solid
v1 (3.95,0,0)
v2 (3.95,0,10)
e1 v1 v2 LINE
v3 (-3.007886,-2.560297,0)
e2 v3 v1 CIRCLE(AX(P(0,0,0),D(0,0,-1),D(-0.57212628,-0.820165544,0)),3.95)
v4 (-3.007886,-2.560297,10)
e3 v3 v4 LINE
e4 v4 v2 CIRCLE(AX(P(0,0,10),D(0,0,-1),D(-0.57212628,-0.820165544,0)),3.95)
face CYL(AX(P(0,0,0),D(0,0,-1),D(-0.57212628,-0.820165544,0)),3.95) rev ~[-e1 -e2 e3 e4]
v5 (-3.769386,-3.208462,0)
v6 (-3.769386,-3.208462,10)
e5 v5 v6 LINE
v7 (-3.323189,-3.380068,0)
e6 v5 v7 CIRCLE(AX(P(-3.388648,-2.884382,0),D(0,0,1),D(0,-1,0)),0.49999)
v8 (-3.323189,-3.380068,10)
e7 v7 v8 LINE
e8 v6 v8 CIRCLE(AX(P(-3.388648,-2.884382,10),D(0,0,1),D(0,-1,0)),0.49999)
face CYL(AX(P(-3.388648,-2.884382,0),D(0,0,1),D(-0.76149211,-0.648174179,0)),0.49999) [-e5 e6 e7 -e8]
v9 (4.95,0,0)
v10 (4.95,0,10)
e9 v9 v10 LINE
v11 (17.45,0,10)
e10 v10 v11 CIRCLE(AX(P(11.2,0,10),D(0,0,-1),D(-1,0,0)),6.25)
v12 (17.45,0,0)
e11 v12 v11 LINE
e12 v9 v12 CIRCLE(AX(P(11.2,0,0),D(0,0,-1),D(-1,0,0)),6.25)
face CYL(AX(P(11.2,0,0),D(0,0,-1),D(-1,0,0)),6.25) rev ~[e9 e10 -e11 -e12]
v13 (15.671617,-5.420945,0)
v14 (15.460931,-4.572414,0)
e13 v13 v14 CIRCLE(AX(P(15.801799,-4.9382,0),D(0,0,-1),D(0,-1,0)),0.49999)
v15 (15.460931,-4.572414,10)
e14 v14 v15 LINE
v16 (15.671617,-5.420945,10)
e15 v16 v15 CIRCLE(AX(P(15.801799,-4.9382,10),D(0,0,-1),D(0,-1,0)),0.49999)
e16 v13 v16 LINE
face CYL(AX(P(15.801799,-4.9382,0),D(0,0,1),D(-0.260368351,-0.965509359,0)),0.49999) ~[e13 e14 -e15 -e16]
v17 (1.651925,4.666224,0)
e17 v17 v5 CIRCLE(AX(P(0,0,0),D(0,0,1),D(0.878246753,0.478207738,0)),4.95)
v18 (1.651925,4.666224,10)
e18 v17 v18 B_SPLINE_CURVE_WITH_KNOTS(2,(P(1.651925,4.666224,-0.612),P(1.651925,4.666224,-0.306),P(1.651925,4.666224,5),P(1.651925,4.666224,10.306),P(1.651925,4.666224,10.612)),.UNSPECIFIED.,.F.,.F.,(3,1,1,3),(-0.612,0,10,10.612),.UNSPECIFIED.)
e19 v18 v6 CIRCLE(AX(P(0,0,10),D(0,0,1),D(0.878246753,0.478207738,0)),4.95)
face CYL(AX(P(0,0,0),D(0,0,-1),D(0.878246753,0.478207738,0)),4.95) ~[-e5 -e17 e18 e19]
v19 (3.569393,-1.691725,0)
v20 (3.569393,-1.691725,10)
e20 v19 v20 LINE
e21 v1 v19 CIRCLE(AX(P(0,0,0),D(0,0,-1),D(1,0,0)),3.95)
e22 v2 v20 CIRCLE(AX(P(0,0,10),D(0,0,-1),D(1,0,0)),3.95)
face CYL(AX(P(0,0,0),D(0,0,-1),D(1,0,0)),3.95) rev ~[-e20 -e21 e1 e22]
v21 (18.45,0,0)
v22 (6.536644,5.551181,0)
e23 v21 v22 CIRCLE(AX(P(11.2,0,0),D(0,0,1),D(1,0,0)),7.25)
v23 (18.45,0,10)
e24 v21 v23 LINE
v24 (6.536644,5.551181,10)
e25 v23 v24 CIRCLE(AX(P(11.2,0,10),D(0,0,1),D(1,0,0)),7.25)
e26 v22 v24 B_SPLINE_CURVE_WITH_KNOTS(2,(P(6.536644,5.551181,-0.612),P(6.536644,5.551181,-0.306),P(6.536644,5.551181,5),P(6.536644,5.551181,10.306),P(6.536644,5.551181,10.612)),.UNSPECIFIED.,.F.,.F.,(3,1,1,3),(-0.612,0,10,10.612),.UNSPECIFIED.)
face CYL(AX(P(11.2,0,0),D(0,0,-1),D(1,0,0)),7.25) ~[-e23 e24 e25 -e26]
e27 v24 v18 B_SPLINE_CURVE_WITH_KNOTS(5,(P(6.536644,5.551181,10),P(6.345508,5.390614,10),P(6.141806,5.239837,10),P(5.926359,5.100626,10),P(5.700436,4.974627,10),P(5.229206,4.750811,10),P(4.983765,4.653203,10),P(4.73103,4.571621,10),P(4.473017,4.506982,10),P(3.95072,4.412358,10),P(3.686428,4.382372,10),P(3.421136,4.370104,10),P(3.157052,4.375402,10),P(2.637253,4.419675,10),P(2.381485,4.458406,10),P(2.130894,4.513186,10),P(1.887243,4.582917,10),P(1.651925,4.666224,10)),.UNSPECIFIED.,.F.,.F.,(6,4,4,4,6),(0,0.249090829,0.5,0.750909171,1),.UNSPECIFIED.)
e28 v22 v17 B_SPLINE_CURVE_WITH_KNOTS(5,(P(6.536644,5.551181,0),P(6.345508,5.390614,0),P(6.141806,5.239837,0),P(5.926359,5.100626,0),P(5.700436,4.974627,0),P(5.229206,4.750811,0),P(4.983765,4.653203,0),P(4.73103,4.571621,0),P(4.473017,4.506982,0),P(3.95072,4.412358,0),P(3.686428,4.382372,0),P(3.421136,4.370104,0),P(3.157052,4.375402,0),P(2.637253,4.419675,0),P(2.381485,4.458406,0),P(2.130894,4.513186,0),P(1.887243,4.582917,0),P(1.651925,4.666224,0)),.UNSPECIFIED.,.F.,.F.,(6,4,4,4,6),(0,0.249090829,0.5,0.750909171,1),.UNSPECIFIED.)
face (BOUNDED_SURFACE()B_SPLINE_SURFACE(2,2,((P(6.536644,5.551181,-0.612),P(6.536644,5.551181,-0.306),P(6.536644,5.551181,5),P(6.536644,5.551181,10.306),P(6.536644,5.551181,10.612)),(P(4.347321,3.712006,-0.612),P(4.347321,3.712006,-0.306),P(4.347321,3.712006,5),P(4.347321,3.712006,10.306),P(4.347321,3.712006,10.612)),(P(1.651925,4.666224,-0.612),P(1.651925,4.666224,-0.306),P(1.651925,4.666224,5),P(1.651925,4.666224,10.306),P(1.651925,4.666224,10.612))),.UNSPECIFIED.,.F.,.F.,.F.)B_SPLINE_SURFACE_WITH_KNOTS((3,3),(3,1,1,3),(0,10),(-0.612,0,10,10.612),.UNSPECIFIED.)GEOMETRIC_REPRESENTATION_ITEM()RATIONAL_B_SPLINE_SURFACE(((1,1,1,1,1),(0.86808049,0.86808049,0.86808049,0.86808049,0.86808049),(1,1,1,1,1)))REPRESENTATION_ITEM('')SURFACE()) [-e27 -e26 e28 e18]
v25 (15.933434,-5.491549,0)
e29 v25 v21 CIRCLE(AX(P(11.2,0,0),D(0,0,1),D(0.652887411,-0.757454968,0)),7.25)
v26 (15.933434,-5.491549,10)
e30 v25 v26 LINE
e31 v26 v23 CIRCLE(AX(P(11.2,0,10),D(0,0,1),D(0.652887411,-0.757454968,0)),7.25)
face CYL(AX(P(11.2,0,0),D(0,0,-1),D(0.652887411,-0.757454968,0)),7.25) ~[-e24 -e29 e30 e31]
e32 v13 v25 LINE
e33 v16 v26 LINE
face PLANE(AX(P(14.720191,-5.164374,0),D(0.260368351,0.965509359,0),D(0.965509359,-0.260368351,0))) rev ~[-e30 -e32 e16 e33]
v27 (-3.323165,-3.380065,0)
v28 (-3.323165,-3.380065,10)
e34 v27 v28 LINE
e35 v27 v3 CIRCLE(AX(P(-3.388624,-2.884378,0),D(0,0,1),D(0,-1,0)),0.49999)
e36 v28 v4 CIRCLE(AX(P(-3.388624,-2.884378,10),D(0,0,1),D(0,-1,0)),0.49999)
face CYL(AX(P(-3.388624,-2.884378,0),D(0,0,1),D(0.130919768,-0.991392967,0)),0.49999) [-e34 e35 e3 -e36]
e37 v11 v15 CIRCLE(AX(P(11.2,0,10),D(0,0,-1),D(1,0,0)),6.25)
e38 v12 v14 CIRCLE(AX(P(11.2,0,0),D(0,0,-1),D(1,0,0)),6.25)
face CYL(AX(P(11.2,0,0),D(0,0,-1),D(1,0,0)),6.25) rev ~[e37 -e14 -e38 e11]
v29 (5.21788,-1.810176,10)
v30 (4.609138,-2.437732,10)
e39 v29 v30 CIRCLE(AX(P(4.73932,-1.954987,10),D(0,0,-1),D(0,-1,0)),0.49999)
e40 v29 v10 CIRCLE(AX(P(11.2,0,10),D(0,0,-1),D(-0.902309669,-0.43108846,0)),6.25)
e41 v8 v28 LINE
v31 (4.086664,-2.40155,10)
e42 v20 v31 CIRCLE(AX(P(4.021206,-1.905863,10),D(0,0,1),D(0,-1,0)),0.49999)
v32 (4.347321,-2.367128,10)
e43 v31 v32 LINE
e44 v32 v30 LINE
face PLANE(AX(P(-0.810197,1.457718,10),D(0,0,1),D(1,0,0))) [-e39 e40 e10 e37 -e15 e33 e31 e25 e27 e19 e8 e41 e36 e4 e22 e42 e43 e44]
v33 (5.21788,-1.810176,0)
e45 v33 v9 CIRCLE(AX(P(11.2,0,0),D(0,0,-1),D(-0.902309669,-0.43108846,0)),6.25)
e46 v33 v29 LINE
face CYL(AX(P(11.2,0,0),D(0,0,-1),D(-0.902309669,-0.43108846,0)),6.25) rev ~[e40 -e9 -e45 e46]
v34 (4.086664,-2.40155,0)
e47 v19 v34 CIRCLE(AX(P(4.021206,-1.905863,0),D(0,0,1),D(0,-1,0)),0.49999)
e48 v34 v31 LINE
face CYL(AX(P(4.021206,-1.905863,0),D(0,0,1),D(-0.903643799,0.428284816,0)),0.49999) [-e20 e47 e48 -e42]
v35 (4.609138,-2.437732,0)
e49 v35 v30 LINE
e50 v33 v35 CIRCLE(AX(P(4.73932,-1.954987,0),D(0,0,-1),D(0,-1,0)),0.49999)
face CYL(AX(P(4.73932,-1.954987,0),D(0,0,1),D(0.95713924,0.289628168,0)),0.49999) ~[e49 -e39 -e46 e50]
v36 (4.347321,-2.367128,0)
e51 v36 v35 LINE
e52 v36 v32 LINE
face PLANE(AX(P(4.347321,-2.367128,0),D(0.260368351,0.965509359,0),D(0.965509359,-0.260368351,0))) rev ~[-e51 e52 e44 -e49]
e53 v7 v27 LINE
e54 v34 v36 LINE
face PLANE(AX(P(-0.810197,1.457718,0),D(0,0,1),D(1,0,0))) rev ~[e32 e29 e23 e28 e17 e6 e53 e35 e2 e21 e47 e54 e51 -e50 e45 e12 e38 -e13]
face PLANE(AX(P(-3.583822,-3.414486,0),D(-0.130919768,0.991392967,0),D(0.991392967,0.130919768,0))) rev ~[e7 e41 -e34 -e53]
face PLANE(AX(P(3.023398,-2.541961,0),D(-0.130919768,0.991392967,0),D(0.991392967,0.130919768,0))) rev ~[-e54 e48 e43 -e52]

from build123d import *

# Parameters (mm, degrees)
F1_DEPTH = 10
F2_R     = 5
F3_R     = 0.49999


# Not quite as in the source:
# - a fillet or chamfer is up to 0.001 mm smaller than in the source, because OpenCascade refuses the exact size


with BuildPart() as f1:
    # F0 (on Top) → F1 (new body)
    with BuildSketch(Plane.XY):
        with BuildLine():
            ThreePointArc((-2.2598988064, -3.2396538989), (-1.8270057081, 3.5020779749), (3.95, 0))
            ThreePointArc((3.95, 0), (4.0500202922, 1.2001209016), (4.3473214286, 2.3671283017))
            ThreePointArc((4.3473214286, 2.3671283017), (-2.9159046624, 4), (-3.5838223047, -3.4144864458))
            Line((-3.5838223047, -3.4144864458), (-2.2598988064, -3.2396538989))
        make_face()
        with BuildLine():
            ThreePointArc((4.3473214286, 2.3671283017), (4.0500202922, 1.2001209016), (3.95, 0))
            ThreePointArc((3.95, 0), (4.0500202922, -1.2001209016), (4.3473214286, -2.3671283017))
            ThreePointArc((4.3473214286, -2.3671283017), (4.7969647211, -1.2213228338), (4.95, 0))
            ThreePointArc((4.95, 0), (4.7969647211, 1.2213228338), (4.3473214286, 2.3671283017))
        make_face()
        with BuildLine():
            ThreePointArc((4.3473214286, -2.3671283017), (4.0500202922, -1.2001209016), (3.95, 0))
            ThreePointArc((3.95, 0), (3.7111266365, -1.352789373), (3.0233979302, -2.5419608485))
            Line((3.0233979302, -2.5419608485), (4.3473214286, -2.3671283017))
        make_face()
        with BuildLine():
            ThreePointArc((4.95, 0), (4.7969647211, -1.2213228338), (4.3473214286, -2.3671283017))
            Line((4.3473214286, -2.3671283017), (5.5605645672, -2.6943028782))
            ThreePointArc((5.5605645672, -2.6943028782), (5.1045520487, -1.3813088983), (4.95, 0))
        make_face()
        with BuildLine():
            ThreePointArc((18.45, 0), (12.4001209016, 7.1499797078), (4.3473214286, 2.3671283017))
            ThreePointArc((4.3473214286, 2.3671283017), (4.7969647211, 1.2213228338), (4.95, 0))
            ThreePointArc((4.95, 0), (11.2, 6.25), (17.45, 0))
            ThreePointArc((17.45, 0), (16.7255629222, -2.9207284011), (14.7201905943, -5.1643739388))
            Line((14.7201905943, -5.1643739388), (15.9334337329, -5.4915485153))
            ThreePointArc((15.9334337329, -5.4915485153), (17.790898822, -3.0203563893), (18.45, 0))
        make_face()
    extrude(amount=F1_DEPTH)

    # F2
    f2_edges = [f1.edges().sort_by_distance(p)[0] for p in [
        (4.347321, 2.367128, 5),
    ]]
    fillet(f2_edges, radius=F2_R)

    # F3 (radius 0.5 in the source; OpenCascade refuses exactly that, so slightly less here)
    f3_edges = [f1.edges().sort_by_distance(p)[0] for p in [
        (-2.259899, -3.239654, 5),
        (3.023398, -2.541961, 5),
        (5.560565, -2.694303, 5),
        (14.720191, -5.164374, 5),
        (-3.583822, -3.414486, 5),
    ]]
    fillet(f3_edges, radius=F3_R)


solid = f1.part
